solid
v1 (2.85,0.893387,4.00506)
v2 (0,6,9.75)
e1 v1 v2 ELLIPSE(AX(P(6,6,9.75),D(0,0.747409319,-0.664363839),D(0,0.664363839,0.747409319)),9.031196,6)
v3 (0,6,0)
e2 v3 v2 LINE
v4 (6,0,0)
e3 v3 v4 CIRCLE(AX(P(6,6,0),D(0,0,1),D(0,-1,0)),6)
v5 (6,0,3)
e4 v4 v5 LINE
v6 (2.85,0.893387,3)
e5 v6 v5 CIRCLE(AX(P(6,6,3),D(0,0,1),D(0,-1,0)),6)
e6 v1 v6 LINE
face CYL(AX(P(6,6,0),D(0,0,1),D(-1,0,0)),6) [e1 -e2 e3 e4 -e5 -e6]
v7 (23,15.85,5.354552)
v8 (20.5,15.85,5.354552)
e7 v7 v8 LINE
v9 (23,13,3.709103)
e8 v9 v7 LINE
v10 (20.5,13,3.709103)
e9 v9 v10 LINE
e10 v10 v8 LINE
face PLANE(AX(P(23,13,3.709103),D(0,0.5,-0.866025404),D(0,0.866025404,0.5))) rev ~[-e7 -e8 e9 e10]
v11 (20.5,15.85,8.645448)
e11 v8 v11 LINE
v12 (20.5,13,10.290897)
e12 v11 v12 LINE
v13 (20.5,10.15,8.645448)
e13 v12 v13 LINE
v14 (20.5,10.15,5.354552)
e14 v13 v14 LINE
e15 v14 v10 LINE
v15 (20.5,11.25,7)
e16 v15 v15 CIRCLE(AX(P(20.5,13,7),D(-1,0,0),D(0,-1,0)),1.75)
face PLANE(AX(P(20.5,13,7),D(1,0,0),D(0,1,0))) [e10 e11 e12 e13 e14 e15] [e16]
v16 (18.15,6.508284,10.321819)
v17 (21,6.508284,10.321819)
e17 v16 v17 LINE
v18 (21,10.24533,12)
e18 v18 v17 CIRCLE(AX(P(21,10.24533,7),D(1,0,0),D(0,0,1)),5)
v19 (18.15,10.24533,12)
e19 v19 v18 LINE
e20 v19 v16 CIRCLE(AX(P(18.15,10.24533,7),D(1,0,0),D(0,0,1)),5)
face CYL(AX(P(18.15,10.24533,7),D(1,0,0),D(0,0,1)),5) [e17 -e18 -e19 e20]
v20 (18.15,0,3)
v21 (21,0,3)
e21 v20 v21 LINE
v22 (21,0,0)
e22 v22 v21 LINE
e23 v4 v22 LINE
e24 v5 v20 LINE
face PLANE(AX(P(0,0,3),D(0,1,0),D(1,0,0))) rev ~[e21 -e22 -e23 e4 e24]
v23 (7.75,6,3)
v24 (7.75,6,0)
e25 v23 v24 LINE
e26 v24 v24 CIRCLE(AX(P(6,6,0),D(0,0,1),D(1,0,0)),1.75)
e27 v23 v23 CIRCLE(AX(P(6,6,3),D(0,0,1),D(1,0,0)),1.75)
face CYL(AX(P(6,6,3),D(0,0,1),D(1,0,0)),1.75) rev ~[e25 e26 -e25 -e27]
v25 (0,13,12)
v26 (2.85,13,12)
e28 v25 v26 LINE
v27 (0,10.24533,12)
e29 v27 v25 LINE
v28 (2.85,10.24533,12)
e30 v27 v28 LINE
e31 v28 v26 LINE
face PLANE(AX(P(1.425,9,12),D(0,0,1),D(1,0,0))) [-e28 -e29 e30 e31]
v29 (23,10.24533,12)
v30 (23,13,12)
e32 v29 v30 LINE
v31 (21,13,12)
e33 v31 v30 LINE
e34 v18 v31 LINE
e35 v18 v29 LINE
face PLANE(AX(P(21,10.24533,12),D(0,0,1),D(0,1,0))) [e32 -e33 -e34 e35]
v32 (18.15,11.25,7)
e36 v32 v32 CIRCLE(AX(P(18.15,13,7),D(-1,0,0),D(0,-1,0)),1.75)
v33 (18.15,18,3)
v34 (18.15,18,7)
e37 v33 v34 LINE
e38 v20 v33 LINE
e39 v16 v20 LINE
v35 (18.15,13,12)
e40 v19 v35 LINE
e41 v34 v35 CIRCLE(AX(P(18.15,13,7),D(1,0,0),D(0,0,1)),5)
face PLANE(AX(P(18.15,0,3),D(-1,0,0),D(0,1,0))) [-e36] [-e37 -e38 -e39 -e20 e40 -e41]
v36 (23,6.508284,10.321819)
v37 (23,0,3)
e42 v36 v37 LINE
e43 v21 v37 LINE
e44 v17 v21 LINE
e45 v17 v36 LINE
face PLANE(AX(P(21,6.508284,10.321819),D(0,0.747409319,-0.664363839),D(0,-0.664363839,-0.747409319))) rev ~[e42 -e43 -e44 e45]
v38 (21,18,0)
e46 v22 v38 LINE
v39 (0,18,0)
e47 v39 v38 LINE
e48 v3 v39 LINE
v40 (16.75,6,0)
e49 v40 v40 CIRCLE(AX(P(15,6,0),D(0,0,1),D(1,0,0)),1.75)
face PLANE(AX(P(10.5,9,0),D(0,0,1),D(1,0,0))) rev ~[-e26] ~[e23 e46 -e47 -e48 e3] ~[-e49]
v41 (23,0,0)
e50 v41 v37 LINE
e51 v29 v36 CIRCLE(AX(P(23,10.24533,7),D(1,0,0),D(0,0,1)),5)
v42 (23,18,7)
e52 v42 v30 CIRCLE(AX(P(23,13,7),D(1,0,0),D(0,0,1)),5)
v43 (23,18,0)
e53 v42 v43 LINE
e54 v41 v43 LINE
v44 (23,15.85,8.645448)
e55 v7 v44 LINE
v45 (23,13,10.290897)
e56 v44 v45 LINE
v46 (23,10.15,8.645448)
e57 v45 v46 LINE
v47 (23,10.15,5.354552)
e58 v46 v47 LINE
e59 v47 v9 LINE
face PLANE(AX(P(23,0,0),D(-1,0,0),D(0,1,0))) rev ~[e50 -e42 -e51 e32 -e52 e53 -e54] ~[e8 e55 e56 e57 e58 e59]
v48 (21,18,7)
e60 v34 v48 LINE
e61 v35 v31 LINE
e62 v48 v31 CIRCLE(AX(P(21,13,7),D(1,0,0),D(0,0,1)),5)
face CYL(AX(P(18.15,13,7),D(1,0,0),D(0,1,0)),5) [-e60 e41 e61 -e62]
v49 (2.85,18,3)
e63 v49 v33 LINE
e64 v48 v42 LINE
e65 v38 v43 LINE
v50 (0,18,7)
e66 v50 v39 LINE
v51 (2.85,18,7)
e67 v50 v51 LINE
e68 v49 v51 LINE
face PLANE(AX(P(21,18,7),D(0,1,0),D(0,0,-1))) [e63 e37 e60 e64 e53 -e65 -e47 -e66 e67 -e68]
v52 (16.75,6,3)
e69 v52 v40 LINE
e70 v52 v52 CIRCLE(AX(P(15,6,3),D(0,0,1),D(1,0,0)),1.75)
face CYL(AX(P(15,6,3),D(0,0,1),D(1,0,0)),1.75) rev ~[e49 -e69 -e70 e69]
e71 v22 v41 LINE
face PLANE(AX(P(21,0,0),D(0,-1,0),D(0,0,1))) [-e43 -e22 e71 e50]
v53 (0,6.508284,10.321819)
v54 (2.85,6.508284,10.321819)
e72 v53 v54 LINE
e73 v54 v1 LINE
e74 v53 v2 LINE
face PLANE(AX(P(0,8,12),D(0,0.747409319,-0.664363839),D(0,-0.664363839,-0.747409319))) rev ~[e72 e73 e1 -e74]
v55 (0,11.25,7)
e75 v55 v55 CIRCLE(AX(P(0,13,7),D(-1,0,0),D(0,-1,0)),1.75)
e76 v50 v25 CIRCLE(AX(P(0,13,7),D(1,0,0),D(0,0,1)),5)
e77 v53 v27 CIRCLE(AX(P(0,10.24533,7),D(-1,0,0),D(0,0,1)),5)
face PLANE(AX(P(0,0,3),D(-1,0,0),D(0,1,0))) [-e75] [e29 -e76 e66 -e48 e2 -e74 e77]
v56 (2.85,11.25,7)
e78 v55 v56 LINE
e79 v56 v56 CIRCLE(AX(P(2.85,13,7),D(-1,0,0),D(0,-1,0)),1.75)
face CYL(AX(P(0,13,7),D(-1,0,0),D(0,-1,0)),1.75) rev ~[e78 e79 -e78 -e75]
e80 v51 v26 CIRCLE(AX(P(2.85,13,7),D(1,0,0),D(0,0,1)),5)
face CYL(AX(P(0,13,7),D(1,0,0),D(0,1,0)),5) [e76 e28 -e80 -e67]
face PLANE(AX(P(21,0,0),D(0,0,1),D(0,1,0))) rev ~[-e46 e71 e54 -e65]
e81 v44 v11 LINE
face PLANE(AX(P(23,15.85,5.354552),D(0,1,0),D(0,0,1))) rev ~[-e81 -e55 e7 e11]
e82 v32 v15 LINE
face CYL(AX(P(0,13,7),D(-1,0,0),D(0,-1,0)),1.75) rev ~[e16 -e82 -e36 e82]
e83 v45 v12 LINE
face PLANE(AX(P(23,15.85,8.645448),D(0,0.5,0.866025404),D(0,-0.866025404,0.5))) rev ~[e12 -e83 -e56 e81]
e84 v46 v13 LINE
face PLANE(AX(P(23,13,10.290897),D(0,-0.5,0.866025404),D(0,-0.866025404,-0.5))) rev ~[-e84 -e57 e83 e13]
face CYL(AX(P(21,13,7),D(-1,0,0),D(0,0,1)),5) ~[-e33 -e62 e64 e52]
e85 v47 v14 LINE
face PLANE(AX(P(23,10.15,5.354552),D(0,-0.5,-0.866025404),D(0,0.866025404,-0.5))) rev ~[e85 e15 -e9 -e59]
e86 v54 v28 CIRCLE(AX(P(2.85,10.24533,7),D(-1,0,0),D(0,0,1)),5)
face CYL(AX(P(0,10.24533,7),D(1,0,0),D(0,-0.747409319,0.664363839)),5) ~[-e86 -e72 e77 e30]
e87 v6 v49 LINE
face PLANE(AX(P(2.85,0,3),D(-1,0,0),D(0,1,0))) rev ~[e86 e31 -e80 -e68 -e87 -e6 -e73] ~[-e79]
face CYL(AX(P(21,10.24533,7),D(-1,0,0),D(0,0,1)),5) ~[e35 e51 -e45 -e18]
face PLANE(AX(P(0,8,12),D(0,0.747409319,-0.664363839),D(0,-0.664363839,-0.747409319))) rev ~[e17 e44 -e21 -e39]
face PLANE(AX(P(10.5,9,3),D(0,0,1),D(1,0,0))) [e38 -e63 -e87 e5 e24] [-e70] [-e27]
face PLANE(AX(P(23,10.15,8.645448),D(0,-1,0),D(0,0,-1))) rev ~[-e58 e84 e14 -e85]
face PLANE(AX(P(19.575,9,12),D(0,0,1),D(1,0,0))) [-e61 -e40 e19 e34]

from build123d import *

# Parameters (mm, degrees)
F0_W      = 21
F0_H      = 18
F1_DEPTH  = 3
F2_W      = 2.85
F2_H      = 18
F3_DEPTH  = 9
F4_R      = 6
F5_R      = 1.75
F6_DEPTH  = 21.001
F7_R      = 5
F8_R      = 1.75
F9_DEPTH  = 3.001
F10_DEPTH = 2
F12_DEPTH = 2.5


with BuildPart() as f1:
    # F0 (on Top) → F1 (new body)
    with BuildSketch(Plane.XY):
        with Locations((10.5, 9)):
            Rectangle(F0_W, F0_H)
    extrude(amount=F1_DEPTH)

    # F2 (on face) → F3 (join)
    with BuildSketch(Plane.XY.offset(3)):
        with Locations((1.425, 9)):
            Rectangle(F2_W, F2_H)
        with Locations((19.575, 9)):
            Rectangle(F2_W, F2_H)
    extrude(amount=F3_DEPTH)

    # F4
    f4_edges = [f1.edges().sort_by_distance(p)[0] for p in [
        (0, 0, 6),
    ]]
    fillet(f4_edges, radius=F4_R)

    # F5 (on face) → F6 (cut, through all)
    with BuildSketch(Plane(origin=(0, 0, 0), x_dir=(0, -1, 0), z_dir=(-1, 0, 0))):
        with Locations((-13, 7)):
            Circle(F5_R)
        Polygon((0, 12), (-8, 12), (0, 3), align=None)
    extrude(amount=-F6_DEPTH, mode=Mode.SUBTRACT)

    # F7
    f7_edges = [f1.edges().sort_by_distance(p)[0] for p in [
        (1.425, 18, 12),
        (19.575, 18, 12),
        (1.425, 8, 12),
        (19.575, 8, 12),
    ]]
    fillet(f7_edges, radius=F7_R)

    # F8 (on face) → F9 (cut, through all)
    with BuildSketch(Plane.XY.offset(3)):
        with Locations((6, 6)):
            Circle(F8_R)
        with Locations((15, 6)):
            Circle(F8_R)
    extrude(amount=-F9_DEPTH, mode=Mode.SUBTRACT)

    # F10 (add): a face of the model
    f10_faces = [f1.faces().sort_by_distance(p)[0] for p in [
        (21, 9.8993100801, 5.1016484072),
    ]]
    extrude(f10_faces, amount=F10_DEPTH)

    # F11 (on face) → F12 (cut)
    with BuildSketch(Plane.YZ.offset(23)):
        Polygon((15.85, 5.3545517328), (15.85, 8.6454482672), (13, 10.2908965344), (10.15, 8.6454482672), (10.15, 5.3545517328), (13, 3.7091034656), align=None)
    extrude(amount=-F12_DEPTH, mode=Mode.SUBTRACT)


solid = f1.part
